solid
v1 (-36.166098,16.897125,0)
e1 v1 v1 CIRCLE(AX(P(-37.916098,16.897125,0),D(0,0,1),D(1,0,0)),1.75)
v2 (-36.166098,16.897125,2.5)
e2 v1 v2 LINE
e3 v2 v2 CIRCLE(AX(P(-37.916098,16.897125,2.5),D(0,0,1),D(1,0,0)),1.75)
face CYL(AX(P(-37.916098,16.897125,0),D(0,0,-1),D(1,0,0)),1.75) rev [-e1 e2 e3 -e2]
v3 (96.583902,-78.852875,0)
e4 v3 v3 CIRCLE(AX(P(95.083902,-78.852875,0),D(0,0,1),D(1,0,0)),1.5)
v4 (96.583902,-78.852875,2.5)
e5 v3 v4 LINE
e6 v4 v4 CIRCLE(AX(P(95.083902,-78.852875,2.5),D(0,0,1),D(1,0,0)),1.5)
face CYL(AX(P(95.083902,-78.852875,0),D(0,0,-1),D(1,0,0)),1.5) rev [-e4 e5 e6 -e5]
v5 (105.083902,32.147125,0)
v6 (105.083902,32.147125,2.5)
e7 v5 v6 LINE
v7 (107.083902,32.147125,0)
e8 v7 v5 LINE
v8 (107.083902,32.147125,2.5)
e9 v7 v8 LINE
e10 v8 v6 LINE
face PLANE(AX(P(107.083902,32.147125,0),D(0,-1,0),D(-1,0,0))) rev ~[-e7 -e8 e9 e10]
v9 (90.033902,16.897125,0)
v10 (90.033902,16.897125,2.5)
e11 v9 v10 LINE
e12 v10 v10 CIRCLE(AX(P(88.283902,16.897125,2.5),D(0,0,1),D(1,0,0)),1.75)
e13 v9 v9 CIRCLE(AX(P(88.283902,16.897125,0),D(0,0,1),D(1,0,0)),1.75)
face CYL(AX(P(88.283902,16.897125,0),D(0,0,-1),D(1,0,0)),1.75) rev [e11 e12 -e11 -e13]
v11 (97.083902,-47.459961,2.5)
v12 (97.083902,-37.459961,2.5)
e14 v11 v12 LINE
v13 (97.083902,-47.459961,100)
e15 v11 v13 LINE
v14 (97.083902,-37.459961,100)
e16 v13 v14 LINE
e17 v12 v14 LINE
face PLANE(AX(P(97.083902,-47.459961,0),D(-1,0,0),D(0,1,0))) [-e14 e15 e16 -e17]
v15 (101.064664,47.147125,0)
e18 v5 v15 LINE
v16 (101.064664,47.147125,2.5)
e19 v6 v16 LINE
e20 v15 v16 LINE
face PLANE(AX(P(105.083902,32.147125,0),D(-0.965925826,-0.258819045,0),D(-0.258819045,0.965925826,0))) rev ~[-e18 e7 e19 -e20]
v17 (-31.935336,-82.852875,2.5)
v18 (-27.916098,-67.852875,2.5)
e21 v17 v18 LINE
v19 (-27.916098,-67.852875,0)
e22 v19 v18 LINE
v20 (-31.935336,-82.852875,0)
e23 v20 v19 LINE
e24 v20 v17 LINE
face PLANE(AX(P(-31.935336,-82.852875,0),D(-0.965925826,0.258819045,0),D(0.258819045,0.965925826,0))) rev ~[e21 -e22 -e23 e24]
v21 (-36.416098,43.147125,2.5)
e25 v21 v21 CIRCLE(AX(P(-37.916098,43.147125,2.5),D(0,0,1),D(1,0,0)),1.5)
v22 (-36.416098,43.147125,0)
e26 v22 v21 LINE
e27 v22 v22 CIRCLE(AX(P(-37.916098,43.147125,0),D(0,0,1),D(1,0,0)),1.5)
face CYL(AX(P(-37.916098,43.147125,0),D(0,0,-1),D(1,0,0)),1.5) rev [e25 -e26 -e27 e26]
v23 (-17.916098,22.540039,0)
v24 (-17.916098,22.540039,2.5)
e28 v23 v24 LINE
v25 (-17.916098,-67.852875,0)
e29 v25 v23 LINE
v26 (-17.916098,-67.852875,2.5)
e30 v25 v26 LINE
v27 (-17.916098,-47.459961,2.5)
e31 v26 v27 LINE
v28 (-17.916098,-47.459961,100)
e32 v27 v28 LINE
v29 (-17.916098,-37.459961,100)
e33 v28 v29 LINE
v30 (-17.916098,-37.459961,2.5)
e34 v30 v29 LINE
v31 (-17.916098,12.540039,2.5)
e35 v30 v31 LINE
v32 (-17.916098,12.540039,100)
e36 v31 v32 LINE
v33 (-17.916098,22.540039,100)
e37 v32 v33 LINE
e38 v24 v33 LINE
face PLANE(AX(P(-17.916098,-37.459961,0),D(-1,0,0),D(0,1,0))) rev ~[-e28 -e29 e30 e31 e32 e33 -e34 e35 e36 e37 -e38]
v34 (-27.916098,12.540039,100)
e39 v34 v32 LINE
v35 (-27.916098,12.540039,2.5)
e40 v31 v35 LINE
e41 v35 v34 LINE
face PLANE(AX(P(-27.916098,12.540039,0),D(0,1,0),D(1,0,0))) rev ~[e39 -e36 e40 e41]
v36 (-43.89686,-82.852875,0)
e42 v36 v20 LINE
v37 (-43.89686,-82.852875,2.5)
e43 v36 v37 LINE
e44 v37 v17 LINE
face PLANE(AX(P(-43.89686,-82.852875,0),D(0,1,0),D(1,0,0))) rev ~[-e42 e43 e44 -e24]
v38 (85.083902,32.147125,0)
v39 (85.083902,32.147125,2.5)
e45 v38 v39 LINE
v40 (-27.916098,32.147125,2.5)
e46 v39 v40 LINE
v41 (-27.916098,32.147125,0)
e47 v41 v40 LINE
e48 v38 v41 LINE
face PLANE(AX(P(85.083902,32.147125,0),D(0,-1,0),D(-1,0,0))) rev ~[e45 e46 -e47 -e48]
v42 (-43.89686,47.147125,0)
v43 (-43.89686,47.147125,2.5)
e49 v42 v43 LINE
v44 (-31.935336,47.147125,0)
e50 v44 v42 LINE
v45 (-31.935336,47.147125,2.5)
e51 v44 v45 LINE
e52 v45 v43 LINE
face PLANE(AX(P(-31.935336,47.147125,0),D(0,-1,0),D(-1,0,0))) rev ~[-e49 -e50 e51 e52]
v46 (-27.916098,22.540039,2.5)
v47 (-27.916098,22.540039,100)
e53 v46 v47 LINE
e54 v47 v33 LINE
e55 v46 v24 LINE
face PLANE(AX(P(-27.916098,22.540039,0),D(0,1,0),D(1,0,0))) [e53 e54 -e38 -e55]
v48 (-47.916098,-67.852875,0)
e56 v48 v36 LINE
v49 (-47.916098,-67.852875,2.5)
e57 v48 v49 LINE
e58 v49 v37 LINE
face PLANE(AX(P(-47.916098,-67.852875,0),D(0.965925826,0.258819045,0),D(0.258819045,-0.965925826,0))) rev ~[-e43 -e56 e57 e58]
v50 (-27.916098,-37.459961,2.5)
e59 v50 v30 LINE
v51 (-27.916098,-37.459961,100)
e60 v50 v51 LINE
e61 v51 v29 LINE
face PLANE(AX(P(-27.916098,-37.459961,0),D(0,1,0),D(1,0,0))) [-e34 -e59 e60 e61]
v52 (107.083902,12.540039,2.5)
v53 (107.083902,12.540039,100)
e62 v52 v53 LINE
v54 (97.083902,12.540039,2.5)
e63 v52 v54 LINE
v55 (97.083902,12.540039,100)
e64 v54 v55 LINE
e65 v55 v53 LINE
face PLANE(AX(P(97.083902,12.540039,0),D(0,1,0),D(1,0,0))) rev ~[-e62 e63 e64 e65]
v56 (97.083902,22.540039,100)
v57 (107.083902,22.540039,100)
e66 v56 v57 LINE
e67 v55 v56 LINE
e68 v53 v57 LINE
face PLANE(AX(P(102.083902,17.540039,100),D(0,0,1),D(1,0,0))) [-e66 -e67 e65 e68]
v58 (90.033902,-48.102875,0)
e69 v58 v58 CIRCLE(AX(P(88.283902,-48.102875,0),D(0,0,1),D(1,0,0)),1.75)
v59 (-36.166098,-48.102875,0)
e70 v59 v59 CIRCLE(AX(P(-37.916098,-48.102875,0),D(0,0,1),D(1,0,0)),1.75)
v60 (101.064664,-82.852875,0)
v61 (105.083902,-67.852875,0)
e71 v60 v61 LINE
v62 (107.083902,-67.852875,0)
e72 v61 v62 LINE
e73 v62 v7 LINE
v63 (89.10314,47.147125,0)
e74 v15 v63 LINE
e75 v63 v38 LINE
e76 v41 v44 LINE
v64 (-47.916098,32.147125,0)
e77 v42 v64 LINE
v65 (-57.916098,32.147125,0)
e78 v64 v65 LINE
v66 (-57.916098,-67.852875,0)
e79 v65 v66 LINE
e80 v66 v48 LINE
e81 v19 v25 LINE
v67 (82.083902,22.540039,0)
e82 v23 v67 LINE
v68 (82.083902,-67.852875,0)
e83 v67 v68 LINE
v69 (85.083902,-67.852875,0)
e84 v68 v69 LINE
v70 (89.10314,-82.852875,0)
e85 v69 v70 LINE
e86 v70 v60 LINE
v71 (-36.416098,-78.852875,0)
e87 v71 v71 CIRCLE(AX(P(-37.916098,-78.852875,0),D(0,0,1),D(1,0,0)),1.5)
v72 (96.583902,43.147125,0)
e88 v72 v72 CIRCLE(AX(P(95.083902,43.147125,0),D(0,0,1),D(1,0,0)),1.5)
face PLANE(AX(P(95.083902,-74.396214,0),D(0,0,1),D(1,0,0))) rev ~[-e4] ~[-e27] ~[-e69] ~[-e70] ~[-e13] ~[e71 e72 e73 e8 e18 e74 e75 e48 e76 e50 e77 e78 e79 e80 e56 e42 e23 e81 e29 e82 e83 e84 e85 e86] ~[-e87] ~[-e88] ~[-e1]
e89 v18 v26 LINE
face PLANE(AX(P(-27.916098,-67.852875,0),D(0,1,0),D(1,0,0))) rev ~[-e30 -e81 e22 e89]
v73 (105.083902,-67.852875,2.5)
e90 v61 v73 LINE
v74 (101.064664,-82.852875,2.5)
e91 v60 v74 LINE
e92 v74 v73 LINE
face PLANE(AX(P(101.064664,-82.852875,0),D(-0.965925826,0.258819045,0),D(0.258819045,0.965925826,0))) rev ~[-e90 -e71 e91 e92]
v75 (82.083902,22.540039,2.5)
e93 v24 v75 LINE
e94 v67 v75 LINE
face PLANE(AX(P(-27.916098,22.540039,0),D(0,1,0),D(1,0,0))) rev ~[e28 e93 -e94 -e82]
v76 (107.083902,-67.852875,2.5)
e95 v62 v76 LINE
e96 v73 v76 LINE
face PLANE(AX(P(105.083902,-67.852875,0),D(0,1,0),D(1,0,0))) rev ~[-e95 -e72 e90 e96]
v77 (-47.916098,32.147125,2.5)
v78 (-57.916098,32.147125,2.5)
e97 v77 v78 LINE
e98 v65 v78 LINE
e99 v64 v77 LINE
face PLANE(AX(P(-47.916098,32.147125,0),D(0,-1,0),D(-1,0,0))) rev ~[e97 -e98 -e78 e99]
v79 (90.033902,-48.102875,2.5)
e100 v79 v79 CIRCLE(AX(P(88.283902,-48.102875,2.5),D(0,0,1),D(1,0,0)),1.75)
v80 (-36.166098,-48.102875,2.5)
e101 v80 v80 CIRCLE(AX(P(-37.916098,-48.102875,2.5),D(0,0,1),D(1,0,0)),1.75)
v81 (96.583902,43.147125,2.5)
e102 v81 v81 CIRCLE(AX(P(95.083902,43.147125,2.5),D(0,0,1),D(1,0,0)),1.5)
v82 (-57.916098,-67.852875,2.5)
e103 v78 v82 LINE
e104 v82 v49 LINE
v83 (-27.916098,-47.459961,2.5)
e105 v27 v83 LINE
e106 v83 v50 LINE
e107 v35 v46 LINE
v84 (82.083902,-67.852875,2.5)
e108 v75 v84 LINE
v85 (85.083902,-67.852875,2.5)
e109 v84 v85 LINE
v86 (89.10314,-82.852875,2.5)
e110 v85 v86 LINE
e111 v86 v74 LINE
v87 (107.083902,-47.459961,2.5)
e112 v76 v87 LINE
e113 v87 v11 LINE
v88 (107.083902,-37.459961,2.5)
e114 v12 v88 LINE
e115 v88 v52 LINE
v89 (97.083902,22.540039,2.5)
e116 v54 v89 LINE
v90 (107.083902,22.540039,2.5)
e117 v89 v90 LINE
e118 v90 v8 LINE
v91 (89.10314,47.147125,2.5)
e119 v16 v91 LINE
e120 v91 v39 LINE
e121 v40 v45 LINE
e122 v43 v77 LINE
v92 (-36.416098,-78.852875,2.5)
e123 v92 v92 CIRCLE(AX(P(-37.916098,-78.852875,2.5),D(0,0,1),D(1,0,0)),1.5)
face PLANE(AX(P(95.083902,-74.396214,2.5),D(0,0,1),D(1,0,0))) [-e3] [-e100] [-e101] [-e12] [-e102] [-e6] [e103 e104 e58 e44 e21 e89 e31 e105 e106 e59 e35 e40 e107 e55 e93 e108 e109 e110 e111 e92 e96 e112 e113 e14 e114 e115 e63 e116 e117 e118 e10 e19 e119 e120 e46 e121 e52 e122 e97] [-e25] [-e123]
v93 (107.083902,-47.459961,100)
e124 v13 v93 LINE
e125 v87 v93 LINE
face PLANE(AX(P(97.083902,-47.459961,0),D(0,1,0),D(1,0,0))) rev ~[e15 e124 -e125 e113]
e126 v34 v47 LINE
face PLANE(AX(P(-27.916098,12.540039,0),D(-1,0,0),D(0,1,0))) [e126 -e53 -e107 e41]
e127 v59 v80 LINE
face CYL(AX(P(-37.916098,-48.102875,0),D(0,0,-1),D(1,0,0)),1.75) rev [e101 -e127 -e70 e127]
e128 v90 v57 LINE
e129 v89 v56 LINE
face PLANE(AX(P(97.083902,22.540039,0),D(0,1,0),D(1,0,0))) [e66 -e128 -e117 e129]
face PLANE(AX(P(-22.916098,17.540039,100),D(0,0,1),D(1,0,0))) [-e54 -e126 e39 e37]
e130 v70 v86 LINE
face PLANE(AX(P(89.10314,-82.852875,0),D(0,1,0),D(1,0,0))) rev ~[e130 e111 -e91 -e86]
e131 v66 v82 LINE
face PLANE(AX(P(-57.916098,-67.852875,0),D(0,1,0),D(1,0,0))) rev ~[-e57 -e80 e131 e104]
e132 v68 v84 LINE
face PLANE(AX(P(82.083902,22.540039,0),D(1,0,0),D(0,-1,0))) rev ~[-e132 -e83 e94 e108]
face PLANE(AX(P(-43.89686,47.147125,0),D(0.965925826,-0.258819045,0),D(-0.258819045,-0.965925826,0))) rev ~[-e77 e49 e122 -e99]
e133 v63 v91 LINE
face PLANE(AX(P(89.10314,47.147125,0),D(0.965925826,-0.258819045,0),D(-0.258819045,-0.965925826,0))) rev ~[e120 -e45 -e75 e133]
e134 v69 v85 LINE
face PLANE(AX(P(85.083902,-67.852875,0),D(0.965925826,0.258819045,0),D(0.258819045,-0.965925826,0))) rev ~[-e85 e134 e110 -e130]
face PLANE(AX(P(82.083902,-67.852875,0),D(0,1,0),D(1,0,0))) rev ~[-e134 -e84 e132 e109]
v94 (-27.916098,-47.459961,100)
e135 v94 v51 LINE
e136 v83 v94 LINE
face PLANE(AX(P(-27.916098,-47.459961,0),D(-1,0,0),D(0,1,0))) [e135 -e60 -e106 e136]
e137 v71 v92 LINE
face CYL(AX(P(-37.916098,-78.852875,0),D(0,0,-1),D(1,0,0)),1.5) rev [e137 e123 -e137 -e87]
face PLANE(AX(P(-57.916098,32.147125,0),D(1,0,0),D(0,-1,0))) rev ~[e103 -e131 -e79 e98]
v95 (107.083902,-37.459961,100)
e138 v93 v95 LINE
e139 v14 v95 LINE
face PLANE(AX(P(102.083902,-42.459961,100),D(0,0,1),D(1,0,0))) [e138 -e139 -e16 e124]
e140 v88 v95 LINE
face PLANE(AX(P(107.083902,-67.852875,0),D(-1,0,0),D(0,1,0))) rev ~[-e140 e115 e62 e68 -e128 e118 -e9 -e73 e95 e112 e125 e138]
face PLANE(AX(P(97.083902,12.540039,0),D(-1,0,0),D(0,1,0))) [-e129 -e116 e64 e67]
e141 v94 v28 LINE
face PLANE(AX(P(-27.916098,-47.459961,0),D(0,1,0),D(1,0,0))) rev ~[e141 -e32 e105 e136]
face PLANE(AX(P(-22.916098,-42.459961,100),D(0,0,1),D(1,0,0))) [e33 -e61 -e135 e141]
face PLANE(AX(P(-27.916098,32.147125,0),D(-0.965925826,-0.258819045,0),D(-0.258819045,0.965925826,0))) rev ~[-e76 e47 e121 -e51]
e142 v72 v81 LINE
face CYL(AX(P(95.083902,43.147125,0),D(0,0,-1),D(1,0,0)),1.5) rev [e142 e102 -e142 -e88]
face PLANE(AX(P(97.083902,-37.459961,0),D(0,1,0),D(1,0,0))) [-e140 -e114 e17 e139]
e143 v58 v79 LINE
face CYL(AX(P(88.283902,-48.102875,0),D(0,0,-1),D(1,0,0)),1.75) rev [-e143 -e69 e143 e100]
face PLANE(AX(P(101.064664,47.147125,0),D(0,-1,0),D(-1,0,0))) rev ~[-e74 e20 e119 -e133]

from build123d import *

# Parameters (mm, degrees)
F0_R     = 1.5
F0_R_2   = 1.75
F1_DEPTH = 2.5
F0_W     = 10
F0_H     = 10
F2_DEPTH = 100


# Not quite as in the source:
# - a feature names something its author has since deleted; it is built from what else it names


with BuildPart() as f1:
    # F0 (on Top) → F1 (new body)
    with BuildSketch(Plane.XY):
        Polygon((105.08390221, -67.8528748304), (85.08390221, -67.8528748304), (89.1031400965, -82.8528748304), (101.0646643235, -82.8528748304), align=None)
        with Locations((95.08390221, -78.8528748304)):
            Circle(F0_R, mode=Mode.SUBTRACT)
        Polygon((-47.91609779, 32.1471251696), (-57.91609779, 32.1471251696), (-57.91609779, -67.8528748304), (-47.91609779, -67.8528748304), (-27.91609779, -67.8528748304), (-17.91609779, -67.8528748304), (-17.91609779, -47.4599613249), (-27.91609779, -47.4599613249), (-27.91609779, -37.4599613249), (-17.91609779, -37.4599613249), (-17.91609779, 12.5400386751), (-27.91609779, 12.5400386751), (-27.91609779, 22.5400386751), (-17.91609779, 22.5400386751), (82.08390221, 22.5400386751), (97.08390221, 22.5400386751), (107.08390221, 22.5400386751), (107.08390221, 32.1471251696), (105.08390221, 32.1471251696), (85.08390221, 32.1471251696), (-27.91609779, 32.1471251696), align=None)
        with Locations((-37.91609779, -48.1028748304)):
            Circle(F0_R_2, mode=Mode.SUBTRACT)
        with Locations((-37.91609779, 16.8971251696)):
            Circle(F0_R_2, mode=Mode.SUBTRACT)
        Polygon((-27.91609779, -67.8528748304), (-47.91609779, -67.8528748304), (-43.8968599035, -82.8528748304), (-31.9353356765, -82.8528748304), align=None)
        with Locations((-37.91609779, -78.8528748304)):
            Circle(F0_R, mode=Mode.SUBTRACT)
        Polygon((-43.8968599035, 47.1471251696), (-47.91609779, 32.1471251696), (-27.91609779, 32.1471251696), (-31.9353356765, 47.1471251696), align=None)
        with Locations((-37.91609779, 43.1471251696)):
            Circle(F0_R, mode=Mode.SUBTRACT)
        Polygon((89.1031400965, 47.1471251696), (85.08390221, 32.1471251696), (105.08390221, 32.1471251696), (101.0646643235, 47.1471251696), align=None)
        with Locations((95.08390221, 43.1471251696)):
            Circle(F0_R, mode=Mode.SUBTRACT)
        Polygon((82.08390221, 12.5400386751), (82.08390221, -67.8528748304), (85.08390221, -67.8528748304), (105.08390221, -67.8528748304), (107.08390221, -67.8528748304), (107.08390221, -47.4599613249), (97.08390221, -47.4599613249), (97.08390221, -37.4599613249), (107.08390221, -37.4599613249), (107.08390221, 12.5400386751), (97.08390221, 12.5400386751), (97.08390221, 22.5400386751), (82.08390221, 22.5400386751), align=None)
        with Locations((88.28390221, -48.1028748304)):
            Circle(F0_R_2, mode=Mode.SUBTRACT)
        with Locations((88.28390221, 16.8971251696)):
            Circle(F0_R_2, mode=Mode.SUBTRACT)
    extrude(amount=F1_DEPTH)

    # F0 (on Top) → F2 (join)
    with BuildSketch(Plane.XY):
        with Locations((-22.91609779, 17.5400386751)):
            Rectangle(F0_W, F0_H)
        with Locations((102.08390221, 17.5400386751)):
            Rectangle(F0_W, F0_H)
        with Locations((102.08390221, -42.4599613249)):
            Rectangle(F0_W, F0_H)
        with Locations((-22.91609779, -42.4599613249)):
            Rectangle(F0_W, F0_H)
    extrude(amount=F2_DEPTH)


solid = f1.part
